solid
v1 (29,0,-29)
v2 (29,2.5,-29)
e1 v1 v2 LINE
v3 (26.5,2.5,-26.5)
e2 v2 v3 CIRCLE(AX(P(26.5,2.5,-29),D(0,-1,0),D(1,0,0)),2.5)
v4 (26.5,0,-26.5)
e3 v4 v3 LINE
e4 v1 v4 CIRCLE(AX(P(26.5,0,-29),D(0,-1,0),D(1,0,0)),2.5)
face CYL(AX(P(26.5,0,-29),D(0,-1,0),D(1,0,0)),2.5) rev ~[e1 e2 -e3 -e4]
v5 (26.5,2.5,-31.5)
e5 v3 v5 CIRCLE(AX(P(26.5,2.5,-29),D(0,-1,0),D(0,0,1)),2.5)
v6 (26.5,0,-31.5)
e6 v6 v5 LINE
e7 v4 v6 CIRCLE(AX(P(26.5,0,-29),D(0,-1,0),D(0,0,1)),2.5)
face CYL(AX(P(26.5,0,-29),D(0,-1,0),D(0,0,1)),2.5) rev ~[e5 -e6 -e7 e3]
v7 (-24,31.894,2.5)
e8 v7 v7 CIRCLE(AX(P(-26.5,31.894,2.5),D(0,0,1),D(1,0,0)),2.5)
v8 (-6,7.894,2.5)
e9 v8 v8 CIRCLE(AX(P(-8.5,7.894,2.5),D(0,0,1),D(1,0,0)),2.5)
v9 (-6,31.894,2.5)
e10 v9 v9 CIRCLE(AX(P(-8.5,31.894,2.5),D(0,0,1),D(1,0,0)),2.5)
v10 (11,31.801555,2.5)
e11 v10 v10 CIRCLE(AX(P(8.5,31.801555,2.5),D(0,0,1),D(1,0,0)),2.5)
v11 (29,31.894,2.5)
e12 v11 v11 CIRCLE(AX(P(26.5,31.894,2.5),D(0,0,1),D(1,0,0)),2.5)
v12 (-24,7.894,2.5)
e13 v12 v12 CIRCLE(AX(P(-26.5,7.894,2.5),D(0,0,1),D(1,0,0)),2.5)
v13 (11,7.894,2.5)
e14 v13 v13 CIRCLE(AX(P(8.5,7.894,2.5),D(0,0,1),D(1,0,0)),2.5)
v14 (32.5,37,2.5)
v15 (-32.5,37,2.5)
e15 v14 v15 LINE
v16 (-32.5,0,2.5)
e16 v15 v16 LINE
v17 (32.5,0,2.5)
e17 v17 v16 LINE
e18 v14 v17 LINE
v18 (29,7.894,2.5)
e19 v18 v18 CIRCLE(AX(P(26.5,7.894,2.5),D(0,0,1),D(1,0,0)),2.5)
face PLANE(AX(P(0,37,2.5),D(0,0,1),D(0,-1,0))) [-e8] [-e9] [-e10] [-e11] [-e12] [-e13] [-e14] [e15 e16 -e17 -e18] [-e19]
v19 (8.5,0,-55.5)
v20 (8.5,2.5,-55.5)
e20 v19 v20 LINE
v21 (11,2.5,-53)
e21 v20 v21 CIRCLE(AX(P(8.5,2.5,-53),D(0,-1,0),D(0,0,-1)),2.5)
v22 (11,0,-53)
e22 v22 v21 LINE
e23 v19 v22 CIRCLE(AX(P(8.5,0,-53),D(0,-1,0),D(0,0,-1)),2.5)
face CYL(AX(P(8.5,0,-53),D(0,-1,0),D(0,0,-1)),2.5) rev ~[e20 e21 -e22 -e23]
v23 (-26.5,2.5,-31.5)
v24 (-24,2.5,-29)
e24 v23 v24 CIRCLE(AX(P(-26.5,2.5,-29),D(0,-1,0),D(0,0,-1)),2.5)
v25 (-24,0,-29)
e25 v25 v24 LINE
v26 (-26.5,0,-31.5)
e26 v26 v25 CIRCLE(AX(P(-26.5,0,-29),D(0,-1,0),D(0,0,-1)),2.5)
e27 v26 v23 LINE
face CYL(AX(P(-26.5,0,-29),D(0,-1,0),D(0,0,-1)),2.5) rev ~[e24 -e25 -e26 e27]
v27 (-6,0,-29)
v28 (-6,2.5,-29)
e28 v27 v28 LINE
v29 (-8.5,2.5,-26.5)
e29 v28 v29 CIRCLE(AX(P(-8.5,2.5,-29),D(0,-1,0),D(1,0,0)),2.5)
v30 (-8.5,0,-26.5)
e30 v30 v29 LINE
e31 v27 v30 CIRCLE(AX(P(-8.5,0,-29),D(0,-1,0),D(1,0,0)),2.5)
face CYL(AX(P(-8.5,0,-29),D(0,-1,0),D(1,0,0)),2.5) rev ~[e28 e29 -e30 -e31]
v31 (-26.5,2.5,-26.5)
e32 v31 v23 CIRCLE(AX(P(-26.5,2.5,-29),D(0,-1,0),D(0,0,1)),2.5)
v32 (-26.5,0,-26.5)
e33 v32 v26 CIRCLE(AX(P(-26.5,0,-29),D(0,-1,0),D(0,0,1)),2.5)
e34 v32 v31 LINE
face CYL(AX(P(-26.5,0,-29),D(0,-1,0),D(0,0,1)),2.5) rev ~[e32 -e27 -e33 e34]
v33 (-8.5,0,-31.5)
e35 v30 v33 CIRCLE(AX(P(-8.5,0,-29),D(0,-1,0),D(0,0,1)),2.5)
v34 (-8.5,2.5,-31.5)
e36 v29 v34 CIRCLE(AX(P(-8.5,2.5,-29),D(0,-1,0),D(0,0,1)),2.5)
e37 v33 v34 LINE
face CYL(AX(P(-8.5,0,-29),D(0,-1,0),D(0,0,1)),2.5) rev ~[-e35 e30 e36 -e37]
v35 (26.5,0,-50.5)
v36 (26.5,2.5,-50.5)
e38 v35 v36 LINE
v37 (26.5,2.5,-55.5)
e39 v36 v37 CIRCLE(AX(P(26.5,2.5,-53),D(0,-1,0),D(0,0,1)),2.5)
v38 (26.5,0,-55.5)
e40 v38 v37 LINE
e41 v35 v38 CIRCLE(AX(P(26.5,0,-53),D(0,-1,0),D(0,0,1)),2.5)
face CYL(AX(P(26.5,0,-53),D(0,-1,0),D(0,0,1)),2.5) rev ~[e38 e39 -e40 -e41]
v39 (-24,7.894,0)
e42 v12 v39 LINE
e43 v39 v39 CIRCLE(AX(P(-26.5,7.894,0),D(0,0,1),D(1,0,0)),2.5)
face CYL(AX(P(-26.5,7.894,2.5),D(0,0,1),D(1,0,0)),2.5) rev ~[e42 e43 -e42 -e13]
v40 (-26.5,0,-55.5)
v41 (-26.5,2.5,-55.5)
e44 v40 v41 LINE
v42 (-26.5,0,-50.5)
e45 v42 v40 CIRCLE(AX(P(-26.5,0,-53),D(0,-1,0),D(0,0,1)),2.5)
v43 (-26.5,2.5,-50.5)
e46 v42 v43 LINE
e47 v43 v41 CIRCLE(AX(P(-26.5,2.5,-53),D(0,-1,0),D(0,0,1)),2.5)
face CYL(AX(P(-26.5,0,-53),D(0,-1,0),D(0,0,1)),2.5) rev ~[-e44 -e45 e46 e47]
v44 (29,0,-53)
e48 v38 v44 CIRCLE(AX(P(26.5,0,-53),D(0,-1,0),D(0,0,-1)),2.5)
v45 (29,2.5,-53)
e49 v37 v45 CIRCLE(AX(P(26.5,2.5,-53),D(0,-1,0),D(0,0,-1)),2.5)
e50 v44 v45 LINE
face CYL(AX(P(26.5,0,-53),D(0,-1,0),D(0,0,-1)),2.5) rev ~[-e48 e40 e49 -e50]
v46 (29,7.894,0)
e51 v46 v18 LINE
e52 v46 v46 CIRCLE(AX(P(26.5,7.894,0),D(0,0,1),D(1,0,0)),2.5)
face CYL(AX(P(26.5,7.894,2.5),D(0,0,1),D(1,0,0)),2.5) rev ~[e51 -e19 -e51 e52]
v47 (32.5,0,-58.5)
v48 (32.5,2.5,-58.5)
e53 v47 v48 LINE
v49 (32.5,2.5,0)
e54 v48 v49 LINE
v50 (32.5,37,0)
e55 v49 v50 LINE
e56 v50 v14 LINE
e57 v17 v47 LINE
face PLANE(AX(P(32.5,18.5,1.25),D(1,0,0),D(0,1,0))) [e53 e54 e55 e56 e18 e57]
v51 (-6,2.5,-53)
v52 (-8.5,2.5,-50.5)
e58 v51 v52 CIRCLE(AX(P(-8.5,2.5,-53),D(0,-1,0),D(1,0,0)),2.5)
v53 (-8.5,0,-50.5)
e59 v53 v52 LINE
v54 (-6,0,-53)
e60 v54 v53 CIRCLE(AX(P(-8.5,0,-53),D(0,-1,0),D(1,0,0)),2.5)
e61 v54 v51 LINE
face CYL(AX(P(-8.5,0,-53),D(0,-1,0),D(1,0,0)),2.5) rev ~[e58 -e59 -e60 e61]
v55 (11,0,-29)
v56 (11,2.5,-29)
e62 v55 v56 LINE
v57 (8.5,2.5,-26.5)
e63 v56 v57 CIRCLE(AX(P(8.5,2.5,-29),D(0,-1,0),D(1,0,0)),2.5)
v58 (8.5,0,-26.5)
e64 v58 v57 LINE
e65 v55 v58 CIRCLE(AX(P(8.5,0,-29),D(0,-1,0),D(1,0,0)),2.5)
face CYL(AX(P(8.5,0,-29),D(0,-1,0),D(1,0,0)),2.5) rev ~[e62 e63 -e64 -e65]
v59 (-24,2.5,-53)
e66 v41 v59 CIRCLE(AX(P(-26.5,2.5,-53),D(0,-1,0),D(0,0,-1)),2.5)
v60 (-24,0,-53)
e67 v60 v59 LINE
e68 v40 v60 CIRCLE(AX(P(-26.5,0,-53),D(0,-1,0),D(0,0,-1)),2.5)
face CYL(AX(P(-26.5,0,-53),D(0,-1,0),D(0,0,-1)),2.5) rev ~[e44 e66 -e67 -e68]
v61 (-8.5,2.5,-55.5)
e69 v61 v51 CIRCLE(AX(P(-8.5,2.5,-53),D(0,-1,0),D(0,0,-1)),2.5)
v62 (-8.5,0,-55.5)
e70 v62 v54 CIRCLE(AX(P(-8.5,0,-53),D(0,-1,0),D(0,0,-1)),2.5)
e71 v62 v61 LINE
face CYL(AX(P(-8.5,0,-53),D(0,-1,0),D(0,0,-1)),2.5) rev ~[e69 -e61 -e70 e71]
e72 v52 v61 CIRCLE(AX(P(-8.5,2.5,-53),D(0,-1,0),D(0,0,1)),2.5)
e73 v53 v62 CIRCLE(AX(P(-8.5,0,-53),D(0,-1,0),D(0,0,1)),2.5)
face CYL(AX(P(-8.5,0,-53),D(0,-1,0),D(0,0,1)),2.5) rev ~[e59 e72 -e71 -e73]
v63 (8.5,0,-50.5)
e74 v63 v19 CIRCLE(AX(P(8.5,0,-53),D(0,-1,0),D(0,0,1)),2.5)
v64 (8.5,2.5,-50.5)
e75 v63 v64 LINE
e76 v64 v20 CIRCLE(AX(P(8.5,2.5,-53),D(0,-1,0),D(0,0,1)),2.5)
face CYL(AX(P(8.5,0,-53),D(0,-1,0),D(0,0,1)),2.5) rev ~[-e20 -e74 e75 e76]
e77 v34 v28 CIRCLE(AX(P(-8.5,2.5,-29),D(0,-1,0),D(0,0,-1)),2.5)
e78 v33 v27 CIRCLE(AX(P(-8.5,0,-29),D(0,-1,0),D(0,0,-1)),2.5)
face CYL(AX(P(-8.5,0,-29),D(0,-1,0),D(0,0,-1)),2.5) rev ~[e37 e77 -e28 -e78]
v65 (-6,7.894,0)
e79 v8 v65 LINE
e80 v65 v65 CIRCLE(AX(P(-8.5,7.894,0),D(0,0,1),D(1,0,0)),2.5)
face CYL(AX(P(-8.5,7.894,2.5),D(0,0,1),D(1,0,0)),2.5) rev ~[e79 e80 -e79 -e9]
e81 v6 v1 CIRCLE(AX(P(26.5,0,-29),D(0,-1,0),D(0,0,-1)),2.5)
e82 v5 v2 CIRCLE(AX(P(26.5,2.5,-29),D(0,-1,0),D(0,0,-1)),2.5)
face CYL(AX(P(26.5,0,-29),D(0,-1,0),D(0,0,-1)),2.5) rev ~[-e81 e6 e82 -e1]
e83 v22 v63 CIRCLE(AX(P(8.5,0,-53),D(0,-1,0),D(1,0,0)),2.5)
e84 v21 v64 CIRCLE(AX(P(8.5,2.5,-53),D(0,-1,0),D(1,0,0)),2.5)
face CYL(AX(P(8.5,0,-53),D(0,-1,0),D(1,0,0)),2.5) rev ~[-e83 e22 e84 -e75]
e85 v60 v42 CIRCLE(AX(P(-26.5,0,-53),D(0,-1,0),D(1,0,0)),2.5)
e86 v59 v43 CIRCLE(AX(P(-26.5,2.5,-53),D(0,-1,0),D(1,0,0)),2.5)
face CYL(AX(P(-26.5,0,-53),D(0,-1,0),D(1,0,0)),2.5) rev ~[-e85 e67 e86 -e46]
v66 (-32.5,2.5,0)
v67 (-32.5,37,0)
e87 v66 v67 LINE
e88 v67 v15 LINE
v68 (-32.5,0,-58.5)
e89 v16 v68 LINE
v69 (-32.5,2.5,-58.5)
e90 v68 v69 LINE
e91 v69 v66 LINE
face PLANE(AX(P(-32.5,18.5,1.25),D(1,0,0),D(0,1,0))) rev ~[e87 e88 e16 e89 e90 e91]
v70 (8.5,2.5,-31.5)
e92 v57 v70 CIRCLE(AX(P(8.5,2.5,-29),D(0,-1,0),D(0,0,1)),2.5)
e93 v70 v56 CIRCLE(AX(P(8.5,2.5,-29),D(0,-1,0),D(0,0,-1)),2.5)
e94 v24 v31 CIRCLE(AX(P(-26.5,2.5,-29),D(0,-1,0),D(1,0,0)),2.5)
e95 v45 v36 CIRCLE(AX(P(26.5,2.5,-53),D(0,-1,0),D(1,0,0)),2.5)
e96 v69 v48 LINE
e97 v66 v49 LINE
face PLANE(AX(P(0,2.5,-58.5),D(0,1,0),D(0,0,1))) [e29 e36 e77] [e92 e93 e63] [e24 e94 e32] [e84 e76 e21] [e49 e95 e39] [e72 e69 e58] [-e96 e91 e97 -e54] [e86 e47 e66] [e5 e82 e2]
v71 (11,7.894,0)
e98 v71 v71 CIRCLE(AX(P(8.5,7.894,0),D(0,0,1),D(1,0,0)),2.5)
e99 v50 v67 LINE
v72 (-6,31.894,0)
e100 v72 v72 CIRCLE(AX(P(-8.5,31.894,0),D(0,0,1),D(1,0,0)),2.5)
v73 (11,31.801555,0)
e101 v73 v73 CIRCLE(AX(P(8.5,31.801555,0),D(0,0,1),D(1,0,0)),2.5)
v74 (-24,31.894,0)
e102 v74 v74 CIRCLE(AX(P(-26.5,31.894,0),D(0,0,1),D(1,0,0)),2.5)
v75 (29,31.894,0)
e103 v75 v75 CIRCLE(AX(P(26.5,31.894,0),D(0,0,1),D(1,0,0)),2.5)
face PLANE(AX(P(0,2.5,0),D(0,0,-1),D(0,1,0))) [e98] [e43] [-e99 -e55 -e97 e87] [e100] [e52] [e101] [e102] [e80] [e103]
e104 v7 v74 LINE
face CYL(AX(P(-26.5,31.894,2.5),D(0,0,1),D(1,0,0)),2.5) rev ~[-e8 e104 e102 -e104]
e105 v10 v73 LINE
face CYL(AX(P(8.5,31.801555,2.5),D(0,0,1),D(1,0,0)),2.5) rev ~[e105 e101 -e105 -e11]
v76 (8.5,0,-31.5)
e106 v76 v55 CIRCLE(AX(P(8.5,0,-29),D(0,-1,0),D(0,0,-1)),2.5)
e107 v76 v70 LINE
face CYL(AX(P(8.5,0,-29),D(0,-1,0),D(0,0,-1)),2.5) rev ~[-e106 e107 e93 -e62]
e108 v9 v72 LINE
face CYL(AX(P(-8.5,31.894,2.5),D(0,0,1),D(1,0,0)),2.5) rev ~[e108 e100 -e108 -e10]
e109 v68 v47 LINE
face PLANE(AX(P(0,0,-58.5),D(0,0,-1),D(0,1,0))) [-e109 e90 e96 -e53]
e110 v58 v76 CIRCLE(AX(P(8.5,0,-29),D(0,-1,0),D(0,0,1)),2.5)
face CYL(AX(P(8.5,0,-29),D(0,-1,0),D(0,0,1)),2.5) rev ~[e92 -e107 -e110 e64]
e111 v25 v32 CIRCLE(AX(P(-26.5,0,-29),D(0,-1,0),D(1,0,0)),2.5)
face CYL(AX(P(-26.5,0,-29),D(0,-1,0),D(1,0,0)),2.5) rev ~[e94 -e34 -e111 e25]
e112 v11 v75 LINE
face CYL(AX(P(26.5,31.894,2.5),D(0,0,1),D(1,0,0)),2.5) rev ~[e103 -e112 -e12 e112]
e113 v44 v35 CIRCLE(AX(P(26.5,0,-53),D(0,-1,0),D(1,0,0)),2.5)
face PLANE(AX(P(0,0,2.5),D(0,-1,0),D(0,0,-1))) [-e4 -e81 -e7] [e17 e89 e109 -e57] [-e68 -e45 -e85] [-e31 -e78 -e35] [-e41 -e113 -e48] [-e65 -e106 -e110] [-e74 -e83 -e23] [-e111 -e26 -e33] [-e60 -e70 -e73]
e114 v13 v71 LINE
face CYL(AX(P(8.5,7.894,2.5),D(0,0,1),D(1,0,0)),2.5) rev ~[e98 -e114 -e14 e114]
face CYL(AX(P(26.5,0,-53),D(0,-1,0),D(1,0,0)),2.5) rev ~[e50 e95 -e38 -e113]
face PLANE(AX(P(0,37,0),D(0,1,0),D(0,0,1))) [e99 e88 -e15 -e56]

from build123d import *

# Parameters (mm, degrees)
F0_W     = 2.5
F0_H     = 58.5
F1_DEPTH = 32.5
F3_DEPTH = 5
F4_R     = 2.5
F5_DEPTH = 5


with BuildPart() as f1:
    # F0 (on Right) → F1 (new body, symmetric)
    with BuildSketch(Plane.YZ):
        Polygon((0, 2.5), (0, 0), (2.5, 0), (37, 0), (37, 2.5), align=None)
        with Locations((1.25, -29.25)):
            Rectangle(F0_W, F0_H)
    extrude(amount=F1_DEPTH, both=True)

    # F2 (on Front) → F3 (cut, symmetric)
    with BuildSketch(Plane.XZ):
        with BuildLine():
            Line((-26.5, -31.5), (-26.5, -26.5))
            ThreePointArc((-26.5, -26.5), (-29, -29), (-26.5, -31.5))
        make_face()
        with BuildLine():
            ThreePointArc((-26.5, -31.5), (-24.732233047, -30.767766953), (-24, -29))
            ThreePointArc((-24, -29), (-24.732233047, -27.232233047), (-26.5, -26.5))
            Line((-26.5, -26.5), (-26.5, -31.5))
        make_face()
        with BuildLine():
            Line((-8.5, -31.5), (-8.5, -26.5))
            ThreePointArc((-8.5, -26.5), (-11, -29), (-8.5, -31.5))
        make_face()
        with BuildLine():
            ThreePointArc((-8.5, -31.5), (-6.732233047, -30.767766953), (-6, -29))
            ThreePointArc((-6, -29), (-6.732233047, -27.232233047), (-8.5, -26.5))
            Line((-8.5, -26.5), (-8.5, -31.5))
        make_face()
        with BuildLine():
            Line((8.5, -31.5), (8.5, -26.5))
            ThreePointArc((8.5, -26.5), (6, -29), (8.5, -31.5))
        make_face()
        with BuildLine():
            ThreePointArc((8.5, -31.5), (10.267766953, -30.767766953), (11, -29))
            ThreePointArc((11, -29), (10.267766953, -27.232233047), (8.5, -26.5))
            Line((8.5, -26.5), (8.5, -31.5))
        make_face()
        with BuildLine():
            Line((26.5, -31.5), (26.5, -26.5))
            ThreePointArc((26.5, -26.5), (24, -29), (26.5, -31.5))
        make_face()
        with BuildLine():
            ThreePointArc((26.5, -31.5), (28.267766953, -30.767766953), (29, -29))
            ThreePointArc((29, -29), (28.267766953, -27.232233047), (26.5, -26.5))
            Line((26.5, -26.5), (26.5, -31.5))
        make_face()
        with BuildLine():
            Line((-26.5, -55.5), (-26.5, -50.5))
            ThreePointArc((-26.5, -50.5), (-29, -53), (-26.5, -55.5))
        make_face()
        with BuildLine():
            ThreePointArc((-24, -53), (-24.732233047, -51.232233047), (-26.5, -50.5))
            Line((-26.5, -50.5), (-26.5, -55.5))
            ThreePointArc((-26.5, -55.5), (-24.732233047, -54.767766953), (-24, -53))
        make_face()
        with BuildLine():
            ThreePointArc((-6, -53), (-6.732233047, -51.232233047), (-8.5, -50.5))
            Line((-8.5, -50.5), (-8.5, -55.5))
            ThreePointArc((-8.5, -55.5), (-6.732233047, -54.767766953), (-6, -53))
        make_face()
        with BuildLine():
            Line((-8.5, -55.5), (-8.5, -50.5))
            ThreePointArc((-8.5, -50.5), (-11, -53), (-8.5, -55.5))
        make_face()
        with BuildLine():
            ThreePointArc((11, -53), (10.267766953, -51.232233047), (8.5, -50.5))
            Line((8.5, -50.5), (8.5, -55.5))
            ThreePointArc((8.5, -55.5), (10.267766953, -54.767766953), (11, -53))
        make_face()
        with BuildLine():
            Line((8.5, -55.5), (8.5, -50.5))
            ThreePointArc((8.5, -50.5), (6, -53), (8.5, -55.5))
        make_face()
        with BuildLine():
            ThreePointArc((29, -53), (28.267766953, -51.232233047), (26.5, -50.5))
            Line((26.5, -50.5), (26.5, -55.5))
            ThreePointArc((26.5, -55.5), (28.267766953, -54.767766953), (29, -53))
        make_face()
        with BuildLine():
            Line((26.5, -55.5), (26.5, -50.5))
            ThreePointArc((26.5, -50.5), (24, -53), (26.5, -55.5))
        make_face()
    extrude(amount=F3_DEPTH, both=True, mode=Mode.SUBTRACT)

    # F4 (on face) → F5 (cut, symmetric)
    with BuildSketch(Plane.XY.offset(2.5)):
        with Locations((-26.5, 7.894)):
            Circle(F4_R)
        with Locations((-26.5, 31.894)):
            Circle(F4_R)
        with Locations((-8.5, 31.894)):
            Circle(F4_R)
        with Locations((-8.5, 7.894)):
            Circle(F4_R)
        with Locations((8.5, 7.894)):
            Circle(F4_R)
        with Locations((8.5, 31.8015553057)):
            Circle(F4_R)
        with Locations((26.5, 31.894)):
            Circle(F4_R)
        with Locations((26.5, 7.894)):
            Circle(F4_R)
    extrude(amount=F5_DEPTH, both=True, mode=Mode.SUBTRACT)


solid = f1.part
